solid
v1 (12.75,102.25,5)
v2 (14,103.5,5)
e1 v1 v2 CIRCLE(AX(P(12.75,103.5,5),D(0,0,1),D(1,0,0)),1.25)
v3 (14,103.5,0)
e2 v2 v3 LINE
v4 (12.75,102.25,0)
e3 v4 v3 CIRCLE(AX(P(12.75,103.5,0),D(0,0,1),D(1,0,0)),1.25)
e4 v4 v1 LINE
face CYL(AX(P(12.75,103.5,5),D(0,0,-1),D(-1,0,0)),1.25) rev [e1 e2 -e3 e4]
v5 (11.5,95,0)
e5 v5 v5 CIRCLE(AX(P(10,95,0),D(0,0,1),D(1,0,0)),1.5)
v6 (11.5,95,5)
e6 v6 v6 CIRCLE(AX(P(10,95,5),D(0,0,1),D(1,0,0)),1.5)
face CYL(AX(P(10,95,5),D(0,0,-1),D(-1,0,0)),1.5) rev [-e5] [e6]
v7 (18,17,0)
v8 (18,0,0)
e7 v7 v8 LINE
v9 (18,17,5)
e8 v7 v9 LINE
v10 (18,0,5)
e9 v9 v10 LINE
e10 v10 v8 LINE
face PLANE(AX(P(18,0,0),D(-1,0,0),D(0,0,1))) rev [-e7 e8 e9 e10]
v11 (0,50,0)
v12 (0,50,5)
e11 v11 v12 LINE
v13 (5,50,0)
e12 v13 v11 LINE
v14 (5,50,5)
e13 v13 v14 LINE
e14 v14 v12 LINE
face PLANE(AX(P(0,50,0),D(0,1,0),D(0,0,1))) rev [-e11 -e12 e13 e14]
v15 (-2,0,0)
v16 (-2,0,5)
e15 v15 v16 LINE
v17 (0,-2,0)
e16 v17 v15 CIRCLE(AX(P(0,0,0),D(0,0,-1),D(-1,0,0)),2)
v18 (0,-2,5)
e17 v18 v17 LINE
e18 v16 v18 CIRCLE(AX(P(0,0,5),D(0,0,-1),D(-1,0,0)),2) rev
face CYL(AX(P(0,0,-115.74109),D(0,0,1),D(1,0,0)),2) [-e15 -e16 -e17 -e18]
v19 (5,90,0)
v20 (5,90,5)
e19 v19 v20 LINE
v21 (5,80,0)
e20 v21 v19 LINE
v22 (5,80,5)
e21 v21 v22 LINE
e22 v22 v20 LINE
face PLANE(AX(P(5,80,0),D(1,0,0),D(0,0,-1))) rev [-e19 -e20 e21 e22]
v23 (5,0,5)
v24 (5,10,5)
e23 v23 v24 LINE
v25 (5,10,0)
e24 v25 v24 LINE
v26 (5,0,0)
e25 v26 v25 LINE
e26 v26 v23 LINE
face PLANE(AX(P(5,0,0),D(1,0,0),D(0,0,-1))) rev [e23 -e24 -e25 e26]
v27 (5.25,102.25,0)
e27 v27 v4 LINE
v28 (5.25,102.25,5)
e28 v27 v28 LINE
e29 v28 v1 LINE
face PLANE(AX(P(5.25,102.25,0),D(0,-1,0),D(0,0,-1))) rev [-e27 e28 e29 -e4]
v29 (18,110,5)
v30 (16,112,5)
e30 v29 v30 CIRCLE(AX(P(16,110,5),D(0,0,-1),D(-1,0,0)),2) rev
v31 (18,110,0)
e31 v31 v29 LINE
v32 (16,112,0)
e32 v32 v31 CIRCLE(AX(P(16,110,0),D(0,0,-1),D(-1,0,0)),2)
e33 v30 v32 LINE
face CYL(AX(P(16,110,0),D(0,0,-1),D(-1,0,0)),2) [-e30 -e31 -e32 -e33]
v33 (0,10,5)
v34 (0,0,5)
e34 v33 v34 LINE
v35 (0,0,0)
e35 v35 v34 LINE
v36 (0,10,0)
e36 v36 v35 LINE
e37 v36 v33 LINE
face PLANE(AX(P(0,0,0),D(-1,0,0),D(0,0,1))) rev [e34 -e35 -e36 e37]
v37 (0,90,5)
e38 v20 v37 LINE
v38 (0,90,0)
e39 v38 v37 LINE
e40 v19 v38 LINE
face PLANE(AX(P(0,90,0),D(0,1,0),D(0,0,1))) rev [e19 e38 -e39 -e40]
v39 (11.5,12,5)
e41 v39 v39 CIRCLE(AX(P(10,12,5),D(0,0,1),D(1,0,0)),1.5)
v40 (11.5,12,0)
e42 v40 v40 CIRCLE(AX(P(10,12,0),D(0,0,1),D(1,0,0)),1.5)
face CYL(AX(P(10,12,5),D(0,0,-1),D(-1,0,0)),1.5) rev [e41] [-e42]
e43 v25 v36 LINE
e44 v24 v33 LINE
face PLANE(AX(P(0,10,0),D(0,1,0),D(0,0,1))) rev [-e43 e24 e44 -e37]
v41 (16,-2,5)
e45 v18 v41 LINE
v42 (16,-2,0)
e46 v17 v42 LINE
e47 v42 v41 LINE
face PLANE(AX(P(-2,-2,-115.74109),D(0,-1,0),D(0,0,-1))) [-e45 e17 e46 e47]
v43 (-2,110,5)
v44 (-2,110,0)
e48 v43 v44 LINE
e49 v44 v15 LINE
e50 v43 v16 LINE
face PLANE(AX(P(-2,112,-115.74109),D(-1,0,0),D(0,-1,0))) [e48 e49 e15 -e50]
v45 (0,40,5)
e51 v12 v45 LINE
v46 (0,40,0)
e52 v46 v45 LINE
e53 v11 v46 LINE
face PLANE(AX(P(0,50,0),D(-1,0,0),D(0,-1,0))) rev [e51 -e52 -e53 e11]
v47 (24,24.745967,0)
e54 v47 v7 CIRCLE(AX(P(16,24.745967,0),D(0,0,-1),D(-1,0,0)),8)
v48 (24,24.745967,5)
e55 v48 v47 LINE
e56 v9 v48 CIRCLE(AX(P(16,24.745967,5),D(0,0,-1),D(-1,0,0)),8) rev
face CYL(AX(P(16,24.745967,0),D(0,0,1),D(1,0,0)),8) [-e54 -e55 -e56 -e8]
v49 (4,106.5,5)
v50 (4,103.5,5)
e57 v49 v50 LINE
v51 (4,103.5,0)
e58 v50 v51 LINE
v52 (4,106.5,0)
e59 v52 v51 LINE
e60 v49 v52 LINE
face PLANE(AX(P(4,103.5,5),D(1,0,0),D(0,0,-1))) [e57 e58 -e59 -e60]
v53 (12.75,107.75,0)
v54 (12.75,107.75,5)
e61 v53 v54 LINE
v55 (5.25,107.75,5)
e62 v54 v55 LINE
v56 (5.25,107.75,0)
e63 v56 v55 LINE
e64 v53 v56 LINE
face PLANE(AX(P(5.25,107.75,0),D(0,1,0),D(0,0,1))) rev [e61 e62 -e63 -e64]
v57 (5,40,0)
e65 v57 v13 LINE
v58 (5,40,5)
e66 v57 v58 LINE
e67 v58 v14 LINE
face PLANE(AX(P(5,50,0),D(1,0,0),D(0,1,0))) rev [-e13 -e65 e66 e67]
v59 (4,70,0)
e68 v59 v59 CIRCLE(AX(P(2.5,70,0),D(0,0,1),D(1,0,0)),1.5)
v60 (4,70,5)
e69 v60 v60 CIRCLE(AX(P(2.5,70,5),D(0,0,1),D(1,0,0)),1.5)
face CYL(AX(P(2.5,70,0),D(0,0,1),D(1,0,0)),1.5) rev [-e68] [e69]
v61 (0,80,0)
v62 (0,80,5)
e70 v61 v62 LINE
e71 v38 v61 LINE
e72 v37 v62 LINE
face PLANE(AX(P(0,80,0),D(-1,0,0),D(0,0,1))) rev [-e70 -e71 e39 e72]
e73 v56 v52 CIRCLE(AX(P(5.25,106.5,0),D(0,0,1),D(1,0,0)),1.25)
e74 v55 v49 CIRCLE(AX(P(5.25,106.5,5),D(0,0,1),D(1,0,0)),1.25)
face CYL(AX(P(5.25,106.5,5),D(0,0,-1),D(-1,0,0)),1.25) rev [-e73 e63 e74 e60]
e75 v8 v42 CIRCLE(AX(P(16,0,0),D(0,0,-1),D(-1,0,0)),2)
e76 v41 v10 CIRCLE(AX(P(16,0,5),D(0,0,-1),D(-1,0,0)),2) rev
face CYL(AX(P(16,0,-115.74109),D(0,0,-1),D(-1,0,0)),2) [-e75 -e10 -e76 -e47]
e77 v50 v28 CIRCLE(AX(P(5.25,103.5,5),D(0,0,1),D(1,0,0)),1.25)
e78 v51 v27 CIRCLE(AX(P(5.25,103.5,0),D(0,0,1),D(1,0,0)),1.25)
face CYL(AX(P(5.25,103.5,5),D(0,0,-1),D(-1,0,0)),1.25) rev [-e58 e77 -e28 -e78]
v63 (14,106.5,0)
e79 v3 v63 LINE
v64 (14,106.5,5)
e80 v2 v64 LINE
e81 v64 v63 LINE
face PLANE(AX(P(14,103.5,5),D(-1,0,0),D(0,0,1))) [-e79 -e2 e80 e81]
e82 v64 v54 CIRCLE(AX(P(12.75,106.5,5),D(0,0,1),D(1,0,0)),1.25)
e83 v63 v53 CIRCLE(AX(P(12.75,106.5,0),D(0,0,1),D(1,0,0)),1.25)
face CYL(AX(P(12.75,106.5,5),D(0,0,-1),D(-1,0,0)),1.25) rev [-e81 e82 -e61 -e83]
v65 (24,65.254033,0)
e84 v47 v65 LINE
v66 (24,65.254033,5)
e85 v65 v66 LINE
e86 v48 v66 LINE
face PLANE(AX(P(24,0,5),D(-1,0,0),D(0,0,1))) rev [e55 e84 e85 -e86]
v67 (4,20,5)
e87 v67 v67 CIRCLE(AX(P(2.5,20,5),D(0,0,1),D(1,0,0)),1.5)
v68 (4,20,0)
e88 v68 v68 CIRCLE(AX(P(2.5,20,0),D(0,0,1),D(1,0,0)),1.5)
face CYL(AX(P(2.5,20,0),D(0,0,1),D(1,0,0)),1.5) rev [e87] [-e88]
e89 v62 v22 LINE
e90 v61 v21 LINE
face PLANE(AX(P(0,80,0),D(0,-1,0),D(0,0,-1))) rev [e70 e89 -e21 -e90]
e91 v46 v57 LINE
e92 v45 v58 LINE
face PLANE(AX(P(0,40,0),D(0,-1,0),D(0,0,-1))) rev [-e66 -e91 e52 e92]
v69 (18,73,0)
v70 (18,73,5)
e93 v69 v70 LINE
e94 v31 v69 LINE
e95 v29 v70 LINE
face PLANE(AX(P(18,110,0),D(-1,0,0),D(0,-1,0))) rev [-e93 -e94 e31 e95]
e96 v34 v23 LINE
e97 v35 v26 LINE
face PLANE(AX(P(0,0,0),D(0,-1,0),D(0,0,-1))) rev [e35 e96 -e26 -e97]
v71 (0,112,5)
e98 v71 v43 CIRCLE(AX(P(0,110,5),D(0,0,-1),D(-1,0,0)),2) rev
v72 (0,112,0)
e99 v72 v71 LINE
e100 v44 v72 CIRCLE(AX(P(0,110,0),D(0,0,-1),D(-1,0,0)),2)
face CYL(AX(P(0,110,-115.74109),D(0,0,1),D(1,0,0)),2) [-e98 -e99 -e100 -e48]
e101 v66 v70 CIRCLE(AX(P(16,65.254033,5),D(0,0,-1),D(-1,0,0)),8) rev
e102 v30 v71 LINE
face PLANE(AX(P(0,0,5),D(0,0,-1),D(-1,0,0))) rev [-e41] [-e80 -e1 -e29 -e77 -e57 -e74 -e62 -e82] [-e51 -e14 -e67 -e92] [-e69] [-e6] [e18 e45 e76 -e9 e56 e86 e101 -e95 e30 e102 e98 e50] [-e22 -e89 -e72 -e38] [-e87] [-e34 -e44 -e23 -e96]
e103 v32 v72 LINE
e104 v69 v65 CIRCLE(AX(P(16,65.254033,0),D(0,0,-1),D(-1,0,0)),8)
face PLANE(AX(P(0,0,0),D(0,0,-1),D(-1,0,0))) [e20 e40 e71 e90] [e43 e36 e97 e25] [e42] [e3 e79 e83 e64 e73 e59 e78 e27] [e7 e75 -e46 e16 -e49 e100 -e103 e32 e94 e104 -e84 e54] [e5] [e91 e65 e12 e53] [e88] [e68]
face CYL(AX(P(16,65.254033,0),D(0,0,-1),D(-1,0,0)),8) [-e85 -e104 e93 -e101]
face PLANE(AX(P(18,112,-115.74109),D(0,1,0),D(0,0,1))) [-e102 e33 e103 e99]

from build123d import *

# Parameters (mm, degrees)
SKETCH1_W           = 24
SKETCH1_H           = 110
SKETCH1_R           = 1.5
BOSS_EXTRUDE1_DEPTH = 5
SKETCH2_W           = 6
SKETCH2_H           = 37
SKETCH2_H_2         = 17
CUT_EXTRUDE1_DEPTH  = 113.698713391
BOSS_EXTRUDE2_DEPTH = 5
SKETCH4_R           = 1.5
SKETCH4_W           = 5
SKETCH4_H           = 10
CUT_EXTRUDE2_DEPTH  = 115.651646303
FILLET1_R           = 2
FILLET2_R           = 8
SKETCH5_W           = 7.5
SKETCH5_H           = 5.5
CUT_EXTRUDE3_DEPTH  = 115.651646303


with BuildPart() as part:
    # Sketch1 → Boss-Extrude1 (new body)
    with BuildSketch(Plane.XY):
        with Locations((12, 55)):
            Rectangle(SKETCH1_W, SKETCH1_H)
        with Locations((10, 12)):
            Circle(SKETCH1_R, mode=Mode.SUBTRACT)
        with Locations((10, 95)):
            Circle(SKETCH1_R, mode=Mode.SUBTRACT)
        with BuildLine():
            Line((4, 103.5), (4, 106.5))
            ThreePointArc((4, 106.5), (5.25, 107.75), (6.5, 106.5))
            Line((6.5, 106.5), (6.5, 103.5))
            ThreePointArc((6.5, 103.5), (5.25, 102.25), (4, 103.5))
        make_face(mode=Mode.SUBTRACT)
        with BuildLine():
            Line((11.5, 103.5), (11.5, 106.5))
            ThreePointArc((11.5, 106.5), (12.75, 107.75), (14, 106.5))
            Line((14, 106.5), (14, 103.5))
            ThreePointArc((14, 103.5), (12.75, 102.25), (11.5, 103.5))
        make_face(mode=Mode.SUBTRACT)
    extrude(amount=BOSS_EXTRUDE1_DEPTH)

    # Sketch2 → Cut-Extrude1 (cut, through all)
    with BuildSketch(Plane.XY.offset(5)):
        with Locations((21, 91.5)):
            Rectangle(SKETCH2_W, SKETCH2_H)
        with Locations((21, 8.5)):
            Rectangle(SKETCH2_W, SKETCH2_H_2)
    extrude(amount=-CUT_EXTRUDE1_DEPTH, mode=Mode.SUBTRACT)

    # Sketch3 → Boss-Extrude2 (add)
    with BuildSketch(Plane.XY.offset(5)):
        Polygon((18, -2), (18, 0), (0, 0), (0, 110), (18, 110), (18, 112), (-2, 112), (-2, -2), align=None)
    extrude(amount=-BOSS_EXTRUDE2_DEPTH)

    # Sketch4 → Cut-Extrude2 (cut, through all)
    with BuildSketch(Plane.XY.offset(5)):
        with Locations((2.5, 20)):
            Circle(SKETCH4_R)
        with Locations((2.5, 70)):
            Circle(SKETCH4_R)
        with Locations((2.5, 5)):
            Rectangle(SKETCH4_W, SKETCH4_H)
        with Locations((2.5, 85)):
            Rectangle(SKETCH4_W, SKETCH4_H)
        with Locations((2.5, 45)):
            Rectangle(SKETCH4_W, SKETCH4_H)
    extrude(amount=-CUT_EXTRUDE2_DEPTH, mode=Mode.SUBTRACT)

    # Fillet1
    fillet1_edges = [part.edges().sort_by_distance(p)[0] for p in [
        (18, 112, 2.5),
        (-2, 112, 2.5),
        (-2, -2, 2.5),
        (18, -2, 2.5),
    ]]
    fillet(fillet1_edges, radius=FILLET1_R)

    # Fillet2
    # the kernel refuses this fillet: 8 mm, written as the material it takes off along each edge
    with BuildSketch(Plane(origin=(24, 17, 24.364916731), x_dir=(0, 1, 0), z_dir=(0, 0, -1))) as fillet2_piece_1:
        with BuildLine():
            CenterArc((7.745966692, -8), FILLET2_R, 90, 75.522487814)
            Line((0, -6), (-0.154919334, -5.96))
            ThreePointArc((-0.154919334, -5.96), (-0.16, -3), (-0.16, 0))
            Line((-0.16, 0), (0, 0.16))
            Line((0, 0.16), (7.745966692, 0.16))
            Line((7.745966692, 0.16), (7.745966692, 0))
        make_face()
    extrude(amount=43.729833462, mode=Mode.SUBTRACT)
    with BuildSketch(Plane(origin=(24, 73, 24.364916731), x_dir=(-1, 0, 0), z_dir=(0, 0, -1))) as fillet2_piece_2:
        with BuildLine():
            CenterArc((8, -7.745966692), FILLET2_R, 104.477512186, 75.522487814)
            Line((0, -7.745966692), (-0.16, -7.745966692))
            Line((-0.16, -7.745966692), (-0.16, 0))
            Line((-0.16, 0), (0, 0.16))
            ThreePointArc((0, 0.16), (3, 0.16), (5.96, 0.154919334))
            Line((5.96, 0.154919334), (6, 0))
        make_face()
    extrude(amount=43.729833462, mode=Mode.SUBTRACT)

    # Sketch5 → Cut-Extrude3 (cut, through all)
    with BuildSketch(Plane.XY.offset(5)):
        with Locations((9, 105)):
            Rectangle(SKETCH5_W, SKETCH5_H)
    extrude(amount=-CUT_EXTRUDE3_DEPTH, mode=Mode.SUBTRACT)


solid = part.part
